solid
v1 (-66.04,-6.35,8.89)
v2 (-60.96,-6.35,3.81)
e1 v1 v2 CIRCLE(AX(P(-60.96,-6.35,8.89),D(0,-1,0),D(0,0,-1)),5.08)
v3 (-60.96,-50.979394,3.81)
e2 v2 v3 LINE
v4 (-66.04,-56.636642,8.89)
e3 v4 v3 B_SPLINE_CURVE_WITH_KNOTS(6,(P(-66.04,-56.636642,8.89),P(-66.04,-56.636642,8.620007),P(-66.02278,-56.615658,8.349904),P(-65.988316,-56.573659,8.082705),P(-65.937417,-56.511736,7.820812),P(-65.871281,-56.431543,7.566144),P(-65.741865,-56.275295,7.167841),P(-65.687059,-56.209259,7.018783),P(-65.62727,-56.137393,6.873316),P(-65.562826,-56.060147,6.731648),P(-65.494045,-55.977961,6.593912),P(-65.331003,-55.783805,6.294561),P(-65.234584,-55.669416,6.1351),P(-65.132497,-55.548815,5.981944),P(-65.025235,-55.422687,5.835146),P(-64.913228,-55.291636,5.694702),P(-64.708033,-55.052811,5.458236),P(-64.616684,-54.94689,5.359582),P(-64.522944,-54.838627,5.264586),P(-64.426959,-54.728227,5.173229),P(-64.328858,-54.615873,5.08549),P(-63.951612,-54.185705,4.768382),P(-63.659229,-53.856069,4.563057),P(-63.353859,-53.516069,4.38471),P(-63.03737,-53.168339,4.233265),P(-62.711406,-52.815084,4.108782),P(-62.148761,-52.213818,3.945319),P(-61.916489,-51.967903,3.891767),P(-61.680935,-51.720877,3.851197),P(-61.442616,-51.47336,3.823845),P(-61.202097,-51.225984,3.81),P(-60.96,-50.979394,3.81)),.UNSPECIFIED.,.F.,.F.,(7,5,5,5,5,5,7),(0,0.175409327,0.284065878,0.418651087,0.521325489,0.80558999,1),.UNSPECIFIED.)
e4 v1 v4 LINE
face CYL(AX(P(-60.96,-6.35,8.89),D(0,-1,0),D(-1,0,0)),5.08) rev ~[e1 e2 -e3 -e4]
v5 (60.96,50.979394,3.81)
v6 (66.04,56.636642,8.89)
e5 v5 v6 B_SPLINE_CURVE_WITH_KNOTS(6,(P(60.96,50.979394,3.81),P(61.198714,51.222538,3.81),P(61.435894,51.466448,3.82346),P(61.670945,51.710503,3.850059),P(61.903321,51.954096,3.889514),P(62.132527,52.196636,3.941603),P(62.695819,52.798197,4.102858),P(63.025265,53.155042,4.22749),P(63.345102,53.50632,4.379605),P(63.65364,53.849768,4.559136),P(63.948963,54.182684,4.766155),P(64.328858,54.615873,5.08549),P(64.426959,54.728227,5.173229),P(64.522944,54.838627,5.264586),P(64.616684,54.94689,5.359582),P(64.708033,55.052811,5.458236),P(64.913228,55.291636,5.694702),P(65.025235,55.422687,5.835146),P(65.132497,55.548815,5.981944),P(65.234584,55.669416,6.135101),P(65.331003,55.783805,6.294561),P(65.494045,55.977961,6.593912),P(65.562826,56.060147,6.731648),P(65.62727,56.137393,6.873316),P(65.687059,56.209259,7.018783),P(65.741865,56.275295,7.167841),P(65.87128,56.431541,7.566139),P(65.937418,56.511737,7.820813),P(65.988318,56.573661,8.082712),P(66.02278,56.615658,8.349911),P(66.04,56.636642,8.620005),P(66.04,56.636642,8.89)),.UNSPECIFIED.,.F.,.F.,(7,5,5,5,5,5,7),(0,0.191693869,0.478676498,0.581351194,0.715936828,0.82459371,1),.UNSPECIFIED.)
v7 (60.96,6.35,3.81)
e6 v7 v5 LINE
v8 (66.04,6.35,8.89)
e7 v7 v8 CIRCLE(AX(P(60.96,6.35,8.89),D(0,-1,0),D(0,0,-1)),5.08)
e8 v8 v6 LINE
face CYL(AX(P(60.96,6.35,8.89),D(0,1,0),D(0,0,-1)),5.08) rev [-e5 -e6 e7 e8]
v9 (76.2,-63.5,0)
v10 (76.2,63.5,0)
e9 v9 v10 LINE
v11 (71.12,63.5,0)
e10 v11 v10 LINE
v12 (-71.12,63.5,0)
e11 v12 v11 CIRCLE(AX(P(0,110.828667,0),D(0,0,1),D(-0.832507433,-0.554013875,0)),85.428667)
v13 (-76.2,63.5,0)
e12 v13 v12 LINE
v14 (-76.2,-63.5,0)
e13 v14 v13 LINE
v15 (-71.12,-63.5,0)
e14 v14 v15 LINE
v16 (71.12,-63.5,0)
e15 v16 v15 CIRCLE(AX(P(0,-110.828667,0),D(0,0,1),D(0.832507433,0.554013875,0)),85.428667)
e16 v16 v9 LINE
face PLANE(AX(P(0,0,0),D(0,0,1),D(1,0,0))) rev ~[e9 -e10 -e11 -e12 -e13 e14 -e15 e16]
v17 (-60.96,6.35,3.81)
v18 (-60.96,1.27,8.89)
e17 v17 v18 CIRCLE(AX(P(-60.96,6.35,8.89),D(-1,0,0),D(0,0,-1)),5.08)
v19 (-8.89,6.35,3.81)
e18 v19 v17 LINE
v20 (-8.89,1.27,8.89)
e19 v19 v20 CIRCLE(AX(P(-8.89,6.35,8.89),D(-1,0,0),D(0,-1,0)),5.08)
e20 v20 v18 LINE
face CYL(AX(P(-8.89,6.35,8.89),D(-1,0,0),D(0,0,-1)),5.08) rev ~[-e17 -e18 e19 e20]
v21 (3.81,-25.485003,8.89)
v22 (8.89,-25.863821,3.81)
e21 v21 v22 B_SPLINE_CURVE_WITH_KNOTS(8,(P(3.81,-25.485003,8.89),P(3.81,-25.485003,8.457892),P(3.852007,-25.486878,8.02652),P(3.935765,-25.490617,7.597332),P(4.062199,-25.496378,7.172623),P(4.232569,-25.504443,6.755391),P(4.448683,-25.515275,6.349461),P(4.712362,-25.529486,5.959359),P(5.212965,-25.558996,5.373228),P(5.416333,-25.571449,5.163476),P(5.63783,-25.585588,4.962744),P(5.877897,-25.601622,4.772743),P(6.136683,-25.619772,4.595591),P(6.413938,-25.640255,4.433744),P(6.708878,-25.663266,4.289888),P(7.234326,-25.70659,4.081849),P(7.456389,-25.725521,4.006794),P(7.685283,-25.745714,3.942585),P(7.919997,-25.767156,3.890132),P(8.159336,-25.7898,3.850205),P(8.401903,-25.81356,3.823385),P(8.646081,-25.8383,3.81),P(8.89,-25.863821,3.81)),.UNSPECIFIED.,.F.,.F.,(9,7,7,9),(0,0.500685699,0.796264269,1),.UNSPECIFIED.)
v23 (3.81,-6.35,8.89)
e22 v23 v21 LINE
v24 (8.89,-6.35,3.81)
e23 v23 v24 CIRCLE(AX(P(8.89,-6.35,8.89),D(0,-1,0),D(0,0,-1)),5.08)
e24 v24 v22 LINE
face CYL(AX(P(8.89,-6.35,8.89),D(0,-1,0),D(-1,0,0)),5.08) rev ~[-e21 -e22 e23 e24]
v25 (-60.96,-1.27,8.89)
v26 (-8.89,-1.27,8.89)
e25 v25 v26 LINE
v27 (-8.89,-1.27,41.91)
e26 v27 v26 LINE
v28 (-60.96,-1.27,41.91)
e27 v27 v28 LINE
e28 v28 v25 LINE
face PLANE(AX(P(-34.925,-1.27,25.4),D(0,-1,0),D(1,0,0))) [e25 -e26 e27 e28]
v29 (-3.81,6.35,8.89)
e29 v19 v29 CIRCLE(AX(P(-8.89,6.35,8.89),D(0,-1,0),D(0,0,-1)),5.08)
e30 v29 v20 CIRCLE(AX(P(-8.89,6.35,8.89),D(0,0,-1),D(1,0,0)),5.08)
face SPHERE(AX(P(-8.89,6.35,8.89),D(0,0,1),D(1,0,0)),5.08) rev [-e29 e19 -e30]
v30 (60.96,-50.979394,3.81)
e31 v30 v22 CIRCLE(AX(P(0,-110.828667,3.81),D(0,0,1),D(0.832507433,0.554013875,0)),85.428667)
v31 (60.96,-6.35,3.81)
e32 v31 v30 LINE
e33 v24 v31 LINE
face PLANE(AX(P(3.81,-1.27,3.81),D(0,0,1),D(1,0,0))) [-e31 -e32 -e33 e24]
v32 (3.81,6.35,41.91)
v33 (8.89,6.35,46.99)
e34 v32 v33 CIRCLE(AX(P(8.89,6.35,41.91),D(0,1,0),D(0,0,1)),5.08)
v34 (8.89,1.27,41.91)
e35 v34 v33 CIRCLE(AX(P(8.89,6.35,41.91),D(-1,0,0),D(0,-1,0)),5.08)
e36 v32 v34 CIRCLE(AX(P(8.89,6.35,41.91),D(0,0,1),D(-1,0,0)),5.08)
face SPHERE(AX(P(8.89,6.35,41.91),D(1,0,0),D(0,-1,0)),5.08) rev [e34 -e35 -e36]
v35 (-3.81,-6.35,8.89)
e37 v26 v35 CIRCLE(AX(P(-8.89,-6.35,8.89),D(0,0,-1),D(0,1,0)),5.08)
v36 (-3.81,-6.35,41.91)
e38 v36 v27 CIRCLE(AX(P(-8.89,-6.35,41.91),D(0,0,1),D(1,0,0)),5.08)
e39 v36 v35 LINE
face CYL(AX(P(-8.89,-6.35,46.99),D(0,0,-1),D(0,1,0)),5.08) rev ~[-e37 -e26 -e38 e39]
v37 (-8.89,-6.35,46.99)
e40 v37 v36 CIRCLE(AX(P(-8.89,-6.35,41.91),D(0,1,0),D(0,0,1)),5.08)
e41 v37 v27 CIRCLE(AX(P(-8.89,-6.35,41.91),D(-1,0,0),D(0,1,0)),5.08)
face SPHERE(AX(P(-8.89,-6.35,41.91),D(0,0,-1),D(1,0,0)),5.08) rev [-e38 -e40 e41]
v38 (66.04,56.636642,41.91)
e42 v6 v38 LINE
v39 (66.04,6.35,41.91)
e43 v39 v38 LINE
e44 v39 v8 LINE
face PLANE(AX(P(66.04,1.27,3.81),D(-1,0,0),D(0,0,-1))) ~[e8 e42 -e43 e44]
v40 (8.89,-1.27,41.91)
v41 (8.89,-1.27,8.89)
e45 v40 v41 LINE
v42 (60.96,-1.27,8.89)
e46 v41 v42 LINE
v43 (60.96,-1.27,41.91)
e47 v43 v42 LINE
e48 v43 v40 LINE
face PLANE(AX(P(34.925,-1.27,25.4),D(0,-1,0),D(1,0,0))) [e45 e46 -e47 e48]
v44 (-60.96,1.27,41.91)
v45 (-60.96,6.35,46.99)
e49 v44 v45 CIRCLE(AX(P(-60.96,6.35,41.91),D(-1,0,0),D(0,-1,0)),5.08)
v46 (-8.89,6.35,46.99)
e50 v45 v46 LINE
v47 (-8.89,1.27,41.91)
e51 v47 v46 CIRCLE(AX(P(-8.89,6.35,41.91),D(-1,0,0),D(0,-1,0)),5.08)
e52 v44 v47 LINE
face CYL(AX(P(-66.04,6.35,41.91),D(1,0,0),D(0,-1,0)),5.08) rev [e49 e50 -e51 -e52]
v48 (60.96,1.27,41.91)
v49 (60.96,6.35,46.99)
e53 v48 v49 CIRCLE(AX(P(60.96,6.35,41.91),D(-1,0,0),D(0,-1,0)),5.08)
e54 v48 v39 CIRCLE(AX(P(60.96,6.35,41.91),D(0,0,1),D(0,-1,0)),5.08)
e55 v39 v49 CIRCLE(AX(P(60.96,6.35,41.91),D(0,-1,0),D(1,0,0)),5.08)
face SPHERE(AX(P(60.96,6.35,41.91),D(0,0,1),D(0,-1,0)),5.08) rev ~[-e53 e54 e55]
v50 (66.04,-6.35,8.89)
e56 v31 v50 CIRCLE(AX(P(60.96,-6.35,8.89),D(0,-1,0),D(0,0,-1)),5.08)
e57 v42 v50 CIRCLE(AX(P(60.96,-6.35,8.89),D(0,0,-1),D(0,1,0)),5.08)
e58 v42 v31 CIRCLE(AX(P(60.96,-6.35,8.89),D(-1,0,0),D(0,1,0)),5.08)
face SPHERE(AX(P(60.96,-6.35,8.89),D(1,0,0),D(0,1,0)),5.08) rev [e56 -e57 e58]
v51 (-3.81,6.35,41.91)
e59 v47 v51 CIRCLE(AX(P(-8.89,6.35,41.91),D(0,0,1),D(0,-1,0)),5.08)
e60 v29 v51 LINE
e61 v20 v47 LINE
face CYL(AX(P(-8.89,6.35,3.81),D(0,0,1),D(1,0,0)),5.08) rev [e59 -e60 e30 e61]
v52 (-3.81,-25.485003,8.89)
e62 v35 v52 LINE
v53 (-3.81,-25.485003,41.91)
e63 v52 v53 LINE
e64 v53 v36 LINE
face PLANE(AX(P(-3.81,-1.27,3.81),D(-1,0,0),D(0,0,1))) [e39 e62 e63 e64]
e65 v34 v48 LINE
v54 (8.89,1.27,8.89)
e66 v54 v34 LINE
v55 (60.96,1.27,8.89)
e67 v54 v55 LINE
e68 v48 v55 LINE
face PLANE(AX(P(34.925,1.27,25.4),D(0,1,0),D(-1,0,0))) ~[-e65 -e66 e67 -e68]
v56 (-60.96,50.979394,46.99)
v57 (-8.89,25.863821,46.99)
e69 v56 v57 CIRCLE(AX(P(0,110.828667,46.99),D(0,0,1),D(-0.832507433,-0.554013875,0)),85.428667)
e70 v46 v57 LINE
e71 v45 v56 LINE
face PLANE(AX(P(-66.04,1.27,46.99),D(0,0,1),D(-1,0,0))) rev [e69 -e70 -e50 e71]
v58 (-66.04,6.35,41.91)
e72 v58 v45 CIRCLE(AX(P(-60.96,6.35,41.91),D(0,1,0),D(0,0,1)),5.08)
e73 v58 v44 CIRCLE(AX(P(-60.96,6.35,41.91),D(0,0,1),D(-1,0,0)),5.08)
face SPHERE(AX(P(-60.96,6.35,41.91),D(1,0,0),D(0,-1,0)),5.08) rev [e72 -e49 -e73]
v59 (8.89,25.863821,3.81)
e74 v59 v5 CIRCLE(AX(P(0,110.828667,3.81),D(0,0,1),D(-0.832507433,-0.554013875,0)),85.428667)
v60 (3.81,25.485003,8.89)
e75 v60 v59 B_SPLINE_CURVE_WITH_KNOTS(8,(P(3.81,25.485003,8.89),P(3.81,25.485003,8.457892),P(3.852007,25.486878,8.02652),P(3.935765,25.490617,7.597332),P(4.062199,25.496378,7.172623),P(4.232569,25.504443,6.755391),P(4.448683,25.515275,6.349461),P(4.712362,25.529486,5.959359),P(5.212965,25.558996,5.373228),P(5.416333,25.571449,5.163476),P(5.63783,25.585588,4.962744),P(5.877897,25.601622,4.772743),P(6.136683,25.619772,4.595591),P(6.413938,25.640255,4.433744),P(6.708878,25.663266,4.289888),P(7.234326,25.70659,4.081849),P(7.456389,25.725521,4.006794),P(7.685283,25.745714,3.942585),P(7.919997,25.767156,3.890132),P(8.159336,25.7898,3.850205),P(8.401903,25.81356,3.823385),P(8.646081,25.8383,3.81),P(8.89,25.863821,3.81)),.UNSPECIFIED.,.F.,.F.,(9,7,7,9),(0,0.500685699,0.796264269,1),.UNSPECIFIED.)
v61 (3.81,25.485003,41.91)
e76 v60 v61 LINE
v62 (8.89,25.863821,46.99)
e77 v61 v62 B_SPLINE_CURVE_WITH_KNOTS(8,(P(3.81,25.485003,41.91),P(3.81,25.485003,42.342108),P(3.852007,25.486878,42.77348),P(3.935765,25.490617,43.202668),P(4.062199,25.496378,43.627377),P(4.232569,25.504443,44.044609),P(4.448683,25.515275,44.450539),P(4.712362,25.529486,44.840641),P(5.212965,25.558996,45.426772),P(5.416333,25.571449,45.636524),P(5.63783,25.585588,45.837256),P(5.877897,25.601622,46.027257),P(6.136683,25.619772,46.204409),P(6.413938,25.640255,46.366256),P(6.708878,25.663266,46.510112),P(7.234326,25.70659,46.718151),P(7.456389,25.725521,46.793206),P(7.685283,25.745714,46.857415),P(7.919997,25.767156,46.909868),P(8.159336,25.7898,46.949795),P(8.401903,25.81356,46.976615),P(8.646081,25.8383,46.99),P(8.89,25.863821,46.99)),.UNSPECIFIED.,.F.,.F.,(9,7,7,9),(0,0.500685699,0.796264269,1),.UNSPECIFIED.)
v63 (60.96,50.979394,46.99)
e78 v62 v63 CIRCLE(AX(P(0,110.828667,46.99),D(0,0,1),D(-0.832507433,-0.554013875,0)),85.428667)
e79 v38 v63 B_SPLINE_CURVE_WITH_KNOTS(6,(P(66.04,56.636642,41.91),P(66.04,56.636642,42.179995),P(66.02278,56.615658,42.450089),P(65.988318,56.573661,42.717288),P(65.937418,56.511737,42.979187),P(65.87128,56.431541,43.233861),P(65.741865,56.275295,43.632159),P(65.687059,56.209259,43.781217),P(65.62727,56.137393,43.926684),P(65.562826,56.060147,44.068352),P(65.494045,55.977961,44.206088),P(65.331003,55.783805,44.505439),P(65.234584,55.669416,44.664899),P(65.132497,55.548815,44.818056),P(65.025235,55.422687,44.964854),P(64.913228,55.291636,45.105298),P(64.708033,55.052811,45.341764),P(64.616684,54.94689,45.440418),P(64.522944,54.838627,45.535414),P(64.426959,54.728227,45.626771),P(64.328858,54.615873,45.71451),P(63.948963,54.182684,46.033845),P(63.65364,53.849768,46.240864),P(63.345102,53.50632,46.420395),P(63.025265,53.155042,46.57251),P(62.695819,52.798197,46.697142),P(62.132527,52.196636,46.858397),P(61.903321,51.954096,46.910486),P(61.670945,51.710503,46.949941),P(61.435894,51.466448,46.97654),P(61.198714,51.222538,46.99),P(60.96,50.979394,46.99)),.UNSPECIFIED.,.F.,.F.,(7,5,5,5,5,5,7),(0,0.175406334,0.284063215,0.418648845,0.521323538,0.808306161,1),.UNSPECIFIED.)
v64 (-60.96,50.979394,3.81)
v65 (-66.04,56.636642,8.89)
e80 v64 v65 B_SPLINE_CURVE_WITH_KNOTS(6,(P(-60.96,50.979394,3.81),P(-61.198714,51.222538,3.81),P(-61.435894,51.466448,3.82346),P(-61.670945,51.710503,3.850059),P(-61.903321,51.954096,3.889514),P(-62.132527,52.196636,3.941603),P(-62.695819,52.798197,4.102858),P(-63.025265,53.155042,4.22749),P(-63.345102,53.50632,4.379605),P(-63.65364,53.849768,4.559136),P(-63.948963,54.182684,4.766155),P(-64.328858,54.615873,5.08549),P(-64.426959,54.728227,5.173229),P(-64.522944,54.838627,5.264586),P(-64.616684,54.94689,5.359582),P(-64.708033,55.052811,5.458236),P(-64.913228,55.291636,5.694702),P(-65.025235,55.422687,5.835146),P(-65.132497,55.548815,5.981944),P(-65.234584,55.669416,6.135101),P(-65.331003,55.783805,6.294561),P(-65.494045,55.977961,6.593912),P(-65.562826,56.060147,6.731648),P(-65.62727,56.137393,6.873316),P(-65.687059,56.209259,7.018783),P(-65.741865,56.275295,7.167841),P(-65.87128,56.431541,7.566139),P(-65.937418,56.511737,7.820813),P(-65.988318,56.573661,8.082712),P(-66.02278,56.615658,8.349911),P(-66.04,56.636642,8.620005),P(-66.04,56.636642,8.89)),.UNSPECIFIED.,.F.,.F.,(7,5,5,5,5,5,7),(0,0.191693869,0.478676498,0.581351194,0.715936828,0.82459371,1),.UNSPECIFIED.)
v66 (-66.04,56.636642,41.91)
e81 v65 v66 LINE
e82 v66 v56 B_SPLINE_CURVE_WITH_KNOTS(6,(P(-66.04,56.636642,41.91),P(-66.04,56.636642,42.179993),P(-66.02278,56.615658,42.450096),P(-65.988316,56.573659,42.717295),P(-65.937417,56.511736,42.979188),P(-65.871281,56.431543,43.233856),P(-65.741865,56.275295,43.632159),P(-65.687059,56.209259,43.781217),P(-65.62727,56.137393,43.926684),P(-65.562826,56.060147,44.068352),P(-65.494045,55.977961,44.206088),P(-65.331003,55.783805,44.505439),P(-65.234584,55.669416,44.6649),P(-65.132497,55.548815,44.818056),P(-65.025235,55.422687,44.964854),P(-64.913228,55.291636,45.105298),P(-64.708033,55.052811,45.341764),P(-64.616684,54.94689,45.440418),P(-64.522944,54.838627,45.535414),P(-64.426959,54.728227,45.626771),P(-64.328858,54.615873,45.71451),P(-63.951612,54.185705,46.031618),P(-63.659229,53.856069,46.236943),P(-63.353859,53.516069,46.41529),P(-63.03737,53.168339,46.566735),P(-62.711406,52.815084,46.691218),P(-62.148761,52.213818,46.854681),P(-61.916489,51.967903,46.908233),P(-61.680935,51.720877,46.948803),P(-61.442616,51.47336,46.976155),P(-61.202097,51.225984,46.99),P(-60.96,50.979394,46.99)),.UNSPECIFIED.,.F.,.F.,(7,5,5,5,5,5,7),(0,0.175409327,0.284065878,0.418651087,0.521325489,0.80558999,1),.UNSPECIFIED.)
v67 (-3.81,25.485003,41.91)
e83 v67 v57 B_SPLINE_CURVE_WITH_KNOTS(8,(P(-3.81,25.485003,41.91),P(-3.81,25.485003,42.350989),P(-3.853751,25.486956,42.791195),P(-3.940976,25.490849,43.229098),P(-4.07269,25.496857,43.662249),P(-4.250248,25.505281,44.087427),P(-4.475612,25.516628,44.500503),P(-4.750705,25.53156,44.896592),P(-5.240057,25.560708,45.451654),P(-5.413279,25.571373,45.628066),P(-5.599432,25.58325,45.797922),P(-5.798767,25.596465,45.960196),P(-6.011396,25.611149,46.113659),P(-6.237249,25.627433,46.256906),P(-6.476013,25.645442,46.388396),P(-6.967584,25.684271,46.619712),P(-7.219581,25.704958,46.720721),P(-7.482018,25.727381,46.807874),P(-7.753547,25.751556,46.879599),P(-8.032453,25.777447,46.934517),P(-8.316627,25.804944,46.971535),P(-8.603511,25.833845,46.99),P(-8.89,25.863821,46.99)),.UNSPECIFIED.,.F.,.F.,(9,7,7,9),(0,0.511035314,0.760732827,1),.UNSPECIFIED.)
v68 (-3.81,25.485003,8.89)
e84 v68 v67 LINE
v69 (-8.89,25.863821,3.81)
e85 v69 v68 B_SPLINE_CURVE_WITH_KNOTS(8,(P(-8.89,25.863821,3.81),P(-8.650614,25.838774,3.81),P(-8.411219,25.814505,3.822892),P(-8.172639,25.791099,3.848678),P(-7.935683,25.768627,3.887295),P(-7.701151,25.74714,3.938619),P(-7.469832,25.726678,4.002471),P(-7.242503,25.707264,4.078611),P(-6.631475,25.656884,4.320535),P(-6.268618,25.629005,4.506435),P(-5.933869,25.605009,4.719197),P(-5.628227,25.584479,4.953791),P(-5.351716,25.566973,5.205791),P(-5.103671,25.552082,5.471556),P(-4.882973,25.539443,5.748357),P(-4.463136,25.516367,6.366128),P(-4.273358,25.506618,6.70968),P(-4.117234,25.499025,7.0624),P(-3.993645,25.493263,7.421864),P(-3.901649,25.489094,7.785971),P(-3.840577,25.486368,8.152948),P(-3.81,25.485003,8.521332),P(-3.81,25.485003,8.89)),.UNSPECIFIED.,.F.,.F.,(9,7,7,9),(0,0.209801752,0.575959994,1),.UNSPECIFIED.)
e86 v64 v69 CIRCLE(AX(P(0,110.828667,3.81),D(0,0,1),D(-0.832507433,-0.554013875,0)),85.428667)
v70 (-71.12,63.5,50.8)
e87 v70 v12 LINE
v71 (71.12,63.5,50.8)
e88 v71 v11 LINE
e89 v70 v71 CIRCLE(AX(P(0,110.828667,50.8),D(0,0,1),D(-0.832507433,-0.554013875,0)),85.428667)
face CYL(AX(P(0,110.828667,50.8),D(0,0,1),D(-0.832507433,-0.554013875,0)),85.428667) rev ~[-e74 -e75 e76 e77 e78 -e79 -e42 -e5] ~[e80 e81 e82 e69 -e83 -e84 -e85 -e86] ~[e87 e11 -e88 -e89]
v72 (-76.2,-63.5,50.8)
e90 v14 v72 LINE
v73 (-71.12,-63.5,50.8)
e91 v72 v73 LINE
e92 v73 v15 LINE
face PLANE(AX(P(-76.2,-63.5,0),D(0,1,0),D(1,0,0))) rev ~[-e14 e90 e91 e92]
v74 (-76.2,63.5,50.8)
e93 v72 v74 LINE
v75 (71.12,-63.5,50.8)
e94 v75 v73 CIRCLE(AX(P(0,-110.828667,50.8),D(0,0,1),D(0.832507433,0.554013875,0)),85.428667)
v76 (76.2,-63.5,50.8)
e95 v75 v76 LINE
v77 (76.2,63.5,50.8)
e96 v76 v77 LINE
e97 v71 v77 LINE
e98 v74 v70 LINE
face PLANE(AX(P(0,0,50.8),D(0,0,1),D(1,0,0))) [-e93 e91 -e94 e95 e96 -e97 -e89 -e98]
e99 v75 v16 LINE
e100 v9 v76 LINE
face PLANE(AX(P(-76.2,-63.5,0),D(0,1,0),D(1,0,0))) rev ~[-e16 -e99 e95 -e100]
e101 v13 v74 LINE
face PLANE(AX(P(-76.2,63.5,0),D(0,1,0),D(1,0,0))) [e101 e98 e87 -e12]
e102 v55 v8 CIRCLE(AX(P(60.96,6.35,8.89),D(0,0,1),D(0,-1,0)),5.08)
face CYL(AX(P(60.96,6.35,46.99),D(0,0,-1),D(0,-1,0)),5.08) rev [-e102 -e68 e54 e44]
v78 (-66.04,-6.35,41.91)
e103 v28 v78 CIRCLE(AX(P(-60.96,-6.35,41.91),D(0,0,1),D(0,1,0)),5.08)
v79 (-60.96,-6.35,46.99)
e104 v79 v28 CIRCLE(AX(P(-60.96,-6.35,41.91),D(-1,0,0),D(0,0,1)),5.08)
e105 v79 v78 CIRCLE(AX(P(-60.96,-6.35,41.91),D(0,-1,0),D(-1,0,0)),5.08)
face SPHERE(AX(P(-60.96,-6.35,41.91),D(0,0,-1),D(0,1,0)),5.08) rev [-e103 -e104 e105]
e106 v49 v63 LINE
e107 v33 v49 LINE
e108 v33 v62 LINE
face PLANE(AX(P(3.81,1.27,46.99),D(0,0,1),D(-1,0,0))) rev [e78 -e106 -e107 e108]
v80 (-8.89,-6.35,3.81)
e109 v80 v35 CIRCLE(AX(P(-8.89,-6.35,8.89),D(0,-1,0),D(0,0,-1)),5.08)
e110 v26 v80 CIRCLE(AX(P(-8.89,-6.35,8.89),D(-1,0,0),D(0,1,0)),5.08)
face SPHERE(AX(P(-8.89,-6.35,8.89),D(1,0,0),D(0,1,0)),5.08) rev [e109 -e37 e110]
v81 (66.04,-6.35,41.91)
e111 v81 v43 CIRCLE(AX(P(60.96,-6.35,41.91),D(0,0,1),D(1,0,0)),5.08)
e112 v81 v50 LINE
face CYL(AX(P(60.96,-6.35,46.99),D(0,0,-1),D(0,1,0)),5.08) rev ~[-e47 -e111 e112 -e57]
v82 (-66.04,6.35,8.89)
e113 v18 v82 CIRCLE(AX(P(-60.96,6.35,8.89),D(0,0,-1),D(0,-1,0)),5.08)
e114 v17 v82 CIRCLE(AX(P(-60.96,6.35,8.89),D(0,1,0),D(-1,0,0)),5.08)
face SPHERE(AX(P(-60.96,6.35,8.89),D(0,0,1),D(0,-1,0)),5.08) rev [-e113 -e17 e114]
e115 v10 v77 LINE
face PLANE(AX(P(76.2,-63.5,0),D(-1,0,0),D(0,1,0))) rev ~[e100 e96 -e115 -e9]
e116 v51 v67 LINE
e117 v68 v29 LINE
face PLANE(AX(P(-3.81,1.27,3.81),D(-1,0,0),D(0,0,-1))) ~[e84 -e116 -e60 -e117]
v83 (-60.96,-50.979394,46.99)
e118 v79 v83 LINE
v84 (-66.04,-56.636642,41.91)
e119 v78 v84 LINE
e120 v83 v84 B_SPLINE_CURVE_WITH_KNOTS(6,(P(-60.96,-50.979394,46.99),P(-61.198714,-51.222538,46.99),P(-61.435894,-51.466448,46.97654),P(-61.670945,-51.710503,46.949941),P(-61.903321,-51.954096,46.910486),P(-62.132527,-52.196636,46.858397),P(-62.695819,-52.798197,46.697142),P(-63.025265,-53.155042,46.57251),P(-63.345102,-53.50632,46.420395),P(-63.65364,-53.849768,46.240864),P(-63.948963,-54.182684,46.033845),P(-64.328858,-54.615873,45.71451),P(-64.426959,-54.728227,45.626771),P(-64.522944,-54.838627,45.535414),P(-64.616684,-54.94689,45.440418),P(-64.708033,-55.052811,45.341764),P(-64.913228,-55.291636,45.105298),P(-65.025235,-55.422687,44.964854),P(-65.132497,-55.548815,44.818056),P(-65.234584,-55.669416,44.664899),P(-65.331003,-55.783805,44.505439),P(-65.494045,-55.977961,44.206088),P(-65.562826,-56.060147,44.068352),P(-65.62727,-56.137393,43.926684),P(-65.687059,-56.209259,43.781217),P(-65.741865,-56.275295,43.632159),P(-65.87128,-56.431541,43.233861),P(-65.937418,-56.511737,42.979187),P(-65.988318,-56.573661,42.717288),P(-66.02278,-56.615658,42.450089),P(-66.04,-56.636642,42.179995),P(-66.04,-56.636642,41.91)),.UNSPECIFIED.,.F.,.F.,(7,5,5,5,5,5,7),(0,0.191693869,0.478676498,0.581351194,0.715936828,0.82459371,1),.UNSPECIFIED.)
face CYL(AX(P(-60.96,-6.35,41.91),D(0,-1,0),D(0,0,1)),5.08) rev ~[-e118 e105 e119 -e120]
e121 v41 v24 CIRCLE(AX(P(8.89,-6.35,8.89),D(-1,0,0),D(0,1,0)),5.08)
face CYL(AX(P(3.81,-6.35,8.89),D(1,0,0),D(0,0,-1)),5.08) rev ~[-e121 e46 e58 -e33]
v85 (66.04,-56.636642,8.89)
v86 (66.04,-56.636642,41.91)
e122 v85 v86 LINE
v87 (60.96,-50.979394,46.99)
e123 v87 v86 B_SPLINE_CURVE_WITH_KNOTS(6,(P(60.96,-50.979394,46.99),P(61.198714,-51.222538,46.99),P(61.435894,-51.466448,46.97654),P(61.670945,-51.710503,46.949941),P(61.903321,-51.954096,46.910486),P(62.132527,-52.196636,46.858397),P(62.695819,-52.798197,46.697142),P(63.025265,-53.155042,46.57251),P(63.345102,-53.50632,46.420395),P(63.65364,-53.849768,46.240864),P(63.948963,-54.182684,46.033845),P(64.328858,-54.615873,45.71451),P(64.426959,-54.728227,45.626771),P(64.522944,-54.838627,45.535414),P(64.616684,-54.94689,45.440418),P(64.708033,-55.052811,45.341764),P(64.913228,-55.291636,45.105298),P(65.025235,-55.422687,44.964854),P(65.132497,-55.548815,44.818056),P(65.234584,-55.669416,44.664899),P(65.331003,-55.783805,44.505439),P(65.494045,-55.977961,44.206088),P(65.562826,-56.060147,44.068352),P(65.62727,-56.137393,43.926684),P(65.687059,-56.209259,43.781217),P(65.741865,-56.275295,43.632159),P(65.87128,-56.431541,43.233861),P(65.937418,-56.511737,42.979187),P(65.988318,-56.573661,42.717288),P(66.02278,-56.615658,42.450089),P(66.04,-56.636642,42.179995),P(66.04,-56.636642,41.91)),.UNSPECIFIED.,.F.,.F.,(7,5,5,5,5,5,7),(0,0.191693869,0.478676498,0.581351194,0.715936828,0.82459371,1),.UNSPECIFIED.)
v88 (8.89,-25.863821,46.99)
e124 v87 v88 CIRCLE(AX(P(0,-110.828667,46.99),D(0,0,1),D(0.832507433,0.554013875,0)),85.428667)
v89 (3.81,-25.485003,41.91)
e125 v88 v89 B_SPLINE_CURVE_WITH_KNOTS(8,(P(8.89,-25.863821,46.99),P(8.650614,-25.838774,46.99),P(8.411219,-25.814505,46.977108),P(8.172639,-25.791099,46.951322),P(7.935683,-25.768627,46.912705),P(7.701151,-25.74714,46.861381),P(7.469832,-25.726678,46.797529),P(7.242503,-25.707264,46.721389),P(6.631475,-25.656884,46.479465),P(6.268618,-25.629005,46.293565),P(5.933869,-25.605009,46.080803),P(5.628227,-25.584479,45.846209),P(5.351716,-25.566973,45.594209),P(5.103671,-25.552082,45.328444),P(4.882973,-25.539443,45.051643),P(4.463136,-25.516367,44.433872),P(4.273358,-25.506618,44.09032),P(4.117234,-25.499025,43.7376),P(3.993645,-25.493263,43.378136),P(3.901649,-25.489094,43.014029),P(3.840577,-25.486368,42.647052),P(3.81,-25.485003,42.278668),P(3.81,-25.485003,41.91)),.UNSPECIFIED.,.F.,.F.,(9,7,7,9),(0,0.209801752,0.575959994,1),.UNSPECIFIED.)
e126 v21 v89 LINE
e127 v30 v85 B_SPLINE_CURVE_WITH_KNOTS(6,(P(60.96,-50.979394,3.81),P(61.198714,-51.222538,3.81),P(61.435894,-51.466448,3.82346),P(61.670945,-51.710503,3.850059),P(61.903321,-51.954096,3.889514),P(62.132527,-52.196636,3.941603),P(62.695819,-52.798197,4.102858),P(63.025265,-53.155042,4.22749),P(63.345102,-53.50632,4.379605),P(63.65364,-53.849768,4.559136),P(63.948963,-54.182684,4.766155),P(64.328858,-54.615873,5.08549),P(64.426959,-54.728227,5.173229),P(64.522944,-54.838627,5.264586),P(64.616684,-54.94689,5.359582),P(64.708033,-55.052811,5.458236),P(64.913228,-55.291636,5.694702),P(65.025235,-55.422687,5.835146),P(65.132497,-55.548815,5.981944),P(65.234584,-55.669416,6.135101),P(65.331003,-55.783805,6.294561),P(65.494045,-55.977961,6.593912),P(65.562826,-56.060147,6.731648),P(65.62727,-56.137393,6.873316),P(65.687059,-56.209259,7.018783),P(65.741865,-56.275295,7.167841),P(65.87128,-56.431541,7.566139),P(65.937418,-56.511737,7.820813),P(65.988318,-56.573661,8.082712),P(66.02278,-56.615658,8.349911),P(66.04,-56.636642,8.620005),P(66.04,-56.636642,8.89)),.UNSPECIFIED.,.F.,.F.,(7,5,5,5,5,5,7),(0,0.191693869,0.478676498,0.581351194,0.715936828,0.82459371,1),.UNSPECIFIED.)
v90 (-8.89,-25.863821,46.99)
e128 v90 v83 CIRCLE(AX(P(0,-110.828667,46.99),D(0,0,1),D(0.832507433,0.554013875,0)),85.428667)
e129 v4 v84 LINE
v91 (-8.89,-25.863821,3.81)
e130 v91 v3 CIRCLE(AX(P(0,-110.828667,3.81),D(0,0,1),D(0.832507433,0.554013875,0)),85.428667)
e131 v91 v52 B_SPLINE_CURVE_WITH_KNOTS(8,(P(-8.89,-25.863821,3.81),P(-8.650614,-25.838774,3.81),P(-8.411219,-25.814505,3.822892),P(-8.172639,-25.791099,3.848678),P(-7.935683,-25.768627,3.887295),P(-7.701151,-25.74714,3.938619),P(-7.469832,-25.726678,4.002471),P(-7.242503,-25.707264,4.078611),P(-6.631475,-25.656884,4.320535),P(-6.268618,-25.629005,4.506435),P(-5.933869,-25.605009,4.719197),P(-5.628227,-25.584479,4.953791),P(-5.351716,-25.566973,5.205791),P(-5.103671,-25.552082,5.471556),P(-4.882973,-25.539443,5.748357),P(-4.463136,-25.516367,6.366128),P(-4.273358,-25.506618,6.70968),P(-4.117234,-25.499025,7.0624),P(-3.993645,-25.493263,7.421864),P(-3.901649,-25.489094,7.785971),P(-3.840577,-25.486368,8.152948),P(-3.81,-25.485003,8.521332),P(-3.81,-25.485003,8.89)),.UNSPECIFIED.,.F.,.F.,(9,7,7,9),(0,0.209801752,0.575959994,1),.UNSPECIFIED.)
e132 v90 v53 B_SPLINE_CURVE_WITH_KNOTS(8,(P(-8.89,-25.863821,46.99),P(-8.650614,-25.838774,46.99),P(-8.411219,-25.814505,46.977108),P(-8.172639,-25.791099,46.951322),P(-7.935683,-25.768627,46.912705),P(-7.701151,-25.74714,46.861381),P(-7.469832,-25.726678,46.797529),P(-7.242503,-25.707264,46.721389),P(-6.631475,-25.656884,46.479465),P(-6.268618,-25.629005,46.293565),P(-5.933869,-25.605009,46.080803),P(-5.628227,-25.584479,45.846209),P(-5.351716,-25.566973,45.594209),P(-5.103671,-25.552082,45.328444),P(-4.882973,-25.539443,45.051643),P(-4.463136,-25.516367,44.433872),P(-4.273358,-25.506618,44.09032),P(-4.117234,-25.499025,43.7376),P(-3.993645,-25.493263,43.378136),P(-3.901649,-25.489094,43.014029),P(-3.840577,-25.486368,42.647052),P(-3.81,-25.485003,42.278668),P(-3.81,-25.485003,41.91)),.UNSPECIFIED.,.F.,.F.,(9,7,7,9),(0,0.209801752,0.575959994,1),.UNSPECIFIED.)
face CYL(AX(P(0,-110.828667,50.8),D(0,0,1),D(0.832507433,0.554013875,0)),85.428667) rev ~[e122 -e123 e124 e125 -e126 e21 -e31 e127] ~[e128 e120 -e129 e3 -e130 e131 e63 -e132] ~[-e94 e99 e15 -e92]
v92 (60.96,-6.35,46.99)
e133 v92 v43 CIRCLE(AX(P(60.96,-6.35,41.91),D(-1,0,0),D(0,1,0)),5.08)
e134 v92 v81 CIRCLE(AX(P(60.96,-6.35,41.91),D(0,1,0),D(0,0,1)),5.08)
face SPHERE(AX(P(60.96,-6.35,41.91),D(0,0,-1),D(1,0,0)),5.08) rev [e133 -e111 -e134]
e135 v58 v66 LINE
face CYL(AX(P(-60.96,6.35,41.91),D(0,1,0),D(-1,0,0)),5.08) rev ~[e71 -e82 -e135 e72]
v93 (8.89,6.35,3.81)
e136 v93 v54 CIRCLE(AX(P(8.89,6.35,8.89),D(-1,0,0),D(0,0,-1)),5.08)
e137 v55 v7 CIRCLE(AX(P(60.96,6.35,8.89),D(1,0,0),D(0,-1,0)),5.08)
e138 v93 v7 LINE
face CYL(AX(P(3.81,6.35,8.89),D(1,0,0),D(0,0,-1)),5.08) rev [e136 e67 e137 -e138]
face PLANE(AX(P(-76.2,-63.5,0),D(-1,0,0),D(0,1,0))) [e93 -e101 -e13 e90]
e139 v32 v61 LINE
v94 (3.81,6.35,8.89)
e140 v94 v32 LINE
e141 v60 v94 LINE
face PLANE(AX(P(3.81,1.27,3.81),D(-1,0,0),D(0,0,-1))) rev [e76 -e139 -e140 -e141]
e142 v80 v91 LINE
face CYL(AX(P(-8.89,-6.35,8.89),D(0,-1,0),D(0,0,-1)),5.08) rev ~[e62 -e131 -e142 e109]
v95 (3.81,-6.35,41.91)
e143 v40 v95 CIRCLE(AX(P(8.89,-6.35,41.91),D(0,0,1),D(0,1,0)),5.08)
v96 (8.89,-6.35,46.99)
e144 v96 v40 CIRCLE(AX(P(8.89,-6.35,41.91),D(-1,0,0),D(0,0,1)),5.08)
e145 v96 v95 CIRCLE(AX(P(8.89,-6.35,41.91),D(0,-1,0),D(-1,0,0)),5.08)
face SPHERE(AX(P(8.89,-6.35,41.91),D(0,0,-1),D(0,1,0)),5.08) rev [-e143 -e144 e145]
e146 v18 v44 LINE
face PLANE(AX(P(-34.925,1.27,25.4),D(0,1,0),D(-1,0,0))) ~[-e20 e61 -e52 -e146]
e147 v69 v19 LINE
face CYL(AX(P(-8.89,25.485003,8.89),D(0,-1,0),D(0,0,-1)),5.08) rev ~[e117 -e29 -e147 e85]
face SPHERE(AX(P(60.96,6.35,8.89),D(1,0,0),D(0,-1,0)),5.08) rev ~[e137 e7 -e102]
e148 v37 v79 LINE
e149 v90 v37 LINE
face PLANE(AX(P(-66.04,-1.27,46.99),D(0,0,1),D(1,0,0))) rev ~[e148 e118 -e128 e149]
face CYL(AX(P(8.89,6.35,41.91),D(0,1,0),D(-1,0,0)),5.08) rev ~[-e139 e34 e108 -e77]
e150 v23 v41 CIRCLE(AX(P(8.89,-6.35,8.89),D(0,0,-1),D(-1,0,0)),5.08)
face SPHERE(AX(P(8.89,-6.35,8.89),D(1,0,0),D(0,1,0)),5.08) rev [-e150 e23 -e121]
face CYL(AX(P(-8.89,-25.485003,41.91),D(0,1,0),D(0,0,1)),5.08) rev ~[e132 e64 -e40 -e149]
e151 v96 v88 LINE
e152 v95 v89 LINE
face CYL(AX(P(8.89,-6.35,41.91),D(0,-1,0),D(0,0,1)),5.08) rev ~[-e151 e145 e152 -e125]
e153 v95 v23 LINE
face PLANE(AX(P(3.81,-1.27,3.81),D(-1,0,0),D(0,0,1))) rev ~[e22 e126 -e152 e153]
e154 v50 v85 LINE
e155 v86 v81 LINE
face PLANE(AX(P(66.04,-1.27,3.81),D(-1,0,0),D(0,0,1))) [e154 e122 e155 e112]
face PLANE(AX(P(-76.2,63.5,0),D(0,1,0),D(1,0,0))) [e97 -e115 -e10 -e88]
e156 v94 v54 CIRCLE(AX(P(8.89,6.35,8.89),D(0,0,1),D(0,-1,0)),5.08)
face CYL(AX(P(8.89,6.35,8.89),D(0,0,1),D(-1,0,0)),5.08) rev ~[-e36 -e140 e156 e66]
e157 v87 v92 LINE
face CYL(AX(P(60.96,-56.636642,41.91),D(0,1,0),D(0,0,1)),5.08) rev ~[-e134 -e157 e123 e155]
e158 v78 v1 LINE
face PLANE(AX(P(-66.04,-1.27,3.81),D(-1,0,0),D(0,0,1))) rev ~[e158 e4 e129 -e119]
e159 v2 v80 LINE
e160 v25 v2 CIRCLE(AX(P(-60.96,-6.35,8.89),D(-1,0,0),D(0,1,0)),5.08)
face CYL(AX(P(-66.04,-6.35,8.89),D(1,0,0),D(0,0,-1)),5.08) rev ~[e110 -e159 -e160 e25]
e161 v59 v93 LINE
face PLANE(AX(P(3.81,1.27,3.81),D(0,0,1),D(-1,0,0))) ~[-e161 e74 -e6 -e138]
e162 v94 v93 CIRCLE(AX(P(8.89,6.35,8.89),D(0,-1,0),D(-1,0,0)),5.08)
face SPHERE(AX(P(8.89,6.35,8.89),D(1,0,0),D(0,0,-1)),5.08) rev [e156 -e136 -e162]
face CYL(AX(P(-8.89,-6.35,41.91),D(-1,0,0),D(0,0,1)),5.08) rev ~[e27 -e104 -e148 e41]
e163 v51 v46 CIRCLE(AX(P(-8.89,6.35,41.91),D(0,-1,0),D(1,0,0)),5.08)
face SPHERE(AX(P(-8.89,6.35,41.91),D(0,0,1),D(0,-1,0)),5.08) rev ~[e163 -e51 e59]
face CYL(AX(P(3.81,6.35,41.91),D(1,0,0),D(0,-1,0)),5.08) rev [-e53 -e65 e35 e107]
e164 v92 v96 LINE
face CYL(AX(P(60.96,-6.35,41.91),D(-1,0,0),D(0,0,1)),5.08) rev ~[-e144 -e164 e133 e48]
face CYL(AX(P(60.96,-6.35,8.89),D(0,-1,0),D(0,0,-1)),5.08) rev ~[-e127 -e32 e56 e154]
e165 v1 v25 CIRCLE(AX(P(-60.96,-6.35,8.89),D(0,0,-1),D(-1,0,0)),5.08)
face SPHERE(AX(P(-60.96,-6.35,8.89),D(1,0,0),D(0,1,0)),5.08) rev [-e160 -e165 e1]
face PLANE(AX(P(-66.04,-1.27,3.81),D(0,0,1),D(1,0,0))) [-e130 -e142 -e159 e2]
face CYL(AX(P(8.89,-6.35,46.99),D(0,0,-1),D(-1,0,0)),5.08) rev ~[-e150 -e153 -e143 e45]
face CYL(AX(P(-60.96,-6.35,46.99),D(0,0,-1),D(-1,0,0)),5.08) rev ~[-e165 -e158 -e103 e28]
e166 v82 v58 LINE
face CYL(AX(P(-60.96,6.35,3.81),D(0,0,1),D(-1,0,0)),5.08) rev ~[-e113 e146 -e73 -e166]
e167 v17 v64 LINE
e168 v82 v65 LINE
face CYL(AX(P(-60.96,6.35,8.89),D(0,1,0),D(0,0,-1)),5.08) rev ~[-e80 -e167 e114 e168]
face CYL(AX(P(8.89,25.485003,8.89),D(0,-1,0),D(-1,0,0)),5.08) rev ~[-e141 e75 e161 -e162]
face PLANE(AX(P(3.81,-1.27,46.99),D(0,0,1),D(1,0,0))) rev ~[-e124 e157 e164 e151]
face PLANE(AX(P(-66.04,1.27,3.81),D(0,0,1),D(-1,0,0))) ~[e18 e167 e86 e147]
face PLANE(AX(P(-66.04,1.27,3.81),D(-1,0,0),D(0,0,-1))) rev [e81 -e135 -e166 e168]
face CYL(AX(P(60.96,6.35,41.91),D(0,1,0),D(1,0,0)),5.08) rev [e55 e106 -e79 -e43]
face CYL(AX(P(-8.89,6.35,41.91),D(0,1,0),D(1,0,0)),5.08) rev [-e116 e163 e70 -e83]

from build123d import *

# Parameters (mm, degrees)
F0_W     = 152.4
F0_H     = 127
F1_DEPTH = 50.8
F3_DEPTH = 50.801
F5_W     = 62.23
F5_H     = 43.18
F6_DEPTH = 62.231
F7_F1_R  = 5.08
F7_F2_R  = 5.08
F7_F3_R  = 5.08
F7_F4_R  = 5.08
F7_F5_R  = 5.08
F7_F6_R  = 5.08
F7_F7_R  = 5.08
F7_F8_R  = 5.08
F7_F9_R  = 5.08
F7_F10_R = 5.08
F7_F11_R = 5.08
F7_F12_R = 5.08
F7_F13_R = 5.08
F7_F14_R = 5.08
F7_F15_R = 5.08
F7_F16_R = 5.08


# Not quite as in the source:
# - a pattern or mirror of a feature is missing from the dataset's text; its kind, count and spacing are read off the source's solid


with BuildPart() as f1:
    # F0 (on Top) → F1 (new body)
    with BuildSketch(Plane.XY):
        Rectangle(F0_W, F0_H)
    extrude(amount=F1_DEPTH)

    # F2 (on face) → F3 (cut, through all)
    with BuildSketch(Plane.XY.offset(50.8)):
        with BuildLine():
            Line((-71.12, -63.5), (71.12, -63.5))
            ThreePointArc((71.12, -63.5), (0, -25.4), (-71.12, -63.5))
        make_face()
        with BuildLine():
            ThreePointArc((-71.12, 63.5), (0, 25.4), (71.12, 63.5))
            Line((71.12, 63.5), (-71.12, 63.5))
        make_face()
    extrude(amount=-F3_DEPTH, mode=Mode.SUBTRACT)

    # F5 (on offset) → F6 (cut, through all)
    with BuildSketch(Plane.XZ.offset(1.27)):
        with Locations((-34.925, 25.4)):
            Rectangle(F5_W, F5_H)
        with Locations((34.925, 25.4)):
            Rectangle(F5_W, F5_H)
    f6 = extrude(amount=F6_DEPTH, mode=Mode.SUBTRACT)

    # F6_copies: F6 across plane
    add(f6.mirror(Plane.ZX), mode=Mode.SUBTRACT)

    # F7: fillet of radius 5.08 on 28 edges, made by hand

    # F7_f1
    f7_f1_edges = [f1.edges().sort_by_distance(p)[0] for p in [
        (34.925, -1.27, 3.81),
    ]]
    fillet(f7_f1_edges, radius=F7_F1_R)

    # F7_f2
    f7_f2_edges = [f1.edges().sort_by_distance(p)[0] for p in [
        (66.04, -31.4933212262, 3.81),
    ]]
    fillet(f7_f2_edges, radius=F7_F2_R)

    # F7_f3
    f7_f3_edges = [f1.edges().sort_by_distance(p)[0] for p in [
        (3.81, -15.9175013231, 3.81),
    ]]
    fillet(f7_f3_edges, radius=F7_F3_R)

    # F7_f4
    f7_f4_edges = [f1.edges().sort_by_distance(p)[0] for p in [
        (3.81, -15.9175013231, 46.99),
    ]]
    fillet(f7_f4_edges, radius=F7_F4_R)

    # F7_f5
    f7_f5_edges = [f1.edges().sort_by_distance(p)[0] for p in [
        (-34.925, -1.27, 3.81),
    ]]
    fillet(f7_f5_edges, radius=F7_F5_R)

    # F7_f6
    f7_f6_edges = [f1.edges().sort_by_distance(p)[0] for p in [
        (-3.81, -15.9175013231, 3.81),
    ]]
    fillet(f7_f6_edges, radius=F7_F6_R)

    # F7_f7
    f7_f7_edges = [f1.edges().sort_by_distance(p)[0] for p in [
        (-66.04, -31.4933212262, 3.81),
    ]]
    fillet(f7_f7_edges, radius=F7_F7_R)

    # F7_f8
    f7_f8_edges = [f1.edges().sort_by_distance(p)[0] for p in [
        (-66.04, -31.4933212262, 46.99),
    ]]
    fillet(f7_f8_edges, radius=F7_F8_R)

    # F7_f9
    f7_f9_edges = [f1.edges().sort_by_distance(p)[0] for p in [
        (-3.81, 1.27, 25.4),
    ]]
    fillet(f7_f9_edges, radius=F7_F9_R)

    # F7_f10
    f7_f10_edges = [f1.edges().sort_by_distance(p)[0] for p in [
        (-37.465, 1.27, 46.99),
    ]]
    fillet(f7_f10_edges, radius=F7_F10_R)

    # F7_f11
    f7_f11_edges = [f1.edges().sort_by_distance(p)[0] for p in [
        (-66.04, 31.4933212262, 46.99),
    ]]
    fillet(f7_f11_edges, radius=F7_F11_R)

    # F7_f12
    f7_f12_edges = [f1.edges().sort_by_distance(p)[0] for p in [
        (-66.04, 31.4933212262, 3.81),
    ]]
    fillet(f7_f12_edges, radius=F7_F12_R)

    # F7_f13
    f7_f13_edges = [f1.edges().sort_by_distance(p)[0] for p in [
        (34.925, 1.27, 3.81),
    ]]
    fillet(f7_f13_edges, radius=F7_F13_R)

    # F7_f14
    f7_f14_edges = [f1.edges().sort_by_distance(p)[0] for p in [
        (66.04, 31.4933212262, 3.81),
    ]]
    fillet(f7_f14_edges, radius=F7_F14_R)

    # F7_f15
    f7_f15_edges = [f1.edges().sort_by_distance(p)[0] for p in [
        (66.04, 31.4933212262, 46.99),
    ]]
    fillet(f7_f15_edges, radius=F7_F15_R)

    # F7_f16
    f7_f16_edges = [f1.edges().sort_by_distance(p)[0] for p in [
        (3.81, 1.27, 25.4),
    ]]
    fillet(f7_f16_edges, radius=F7_F16_R)


solid = f1.part
